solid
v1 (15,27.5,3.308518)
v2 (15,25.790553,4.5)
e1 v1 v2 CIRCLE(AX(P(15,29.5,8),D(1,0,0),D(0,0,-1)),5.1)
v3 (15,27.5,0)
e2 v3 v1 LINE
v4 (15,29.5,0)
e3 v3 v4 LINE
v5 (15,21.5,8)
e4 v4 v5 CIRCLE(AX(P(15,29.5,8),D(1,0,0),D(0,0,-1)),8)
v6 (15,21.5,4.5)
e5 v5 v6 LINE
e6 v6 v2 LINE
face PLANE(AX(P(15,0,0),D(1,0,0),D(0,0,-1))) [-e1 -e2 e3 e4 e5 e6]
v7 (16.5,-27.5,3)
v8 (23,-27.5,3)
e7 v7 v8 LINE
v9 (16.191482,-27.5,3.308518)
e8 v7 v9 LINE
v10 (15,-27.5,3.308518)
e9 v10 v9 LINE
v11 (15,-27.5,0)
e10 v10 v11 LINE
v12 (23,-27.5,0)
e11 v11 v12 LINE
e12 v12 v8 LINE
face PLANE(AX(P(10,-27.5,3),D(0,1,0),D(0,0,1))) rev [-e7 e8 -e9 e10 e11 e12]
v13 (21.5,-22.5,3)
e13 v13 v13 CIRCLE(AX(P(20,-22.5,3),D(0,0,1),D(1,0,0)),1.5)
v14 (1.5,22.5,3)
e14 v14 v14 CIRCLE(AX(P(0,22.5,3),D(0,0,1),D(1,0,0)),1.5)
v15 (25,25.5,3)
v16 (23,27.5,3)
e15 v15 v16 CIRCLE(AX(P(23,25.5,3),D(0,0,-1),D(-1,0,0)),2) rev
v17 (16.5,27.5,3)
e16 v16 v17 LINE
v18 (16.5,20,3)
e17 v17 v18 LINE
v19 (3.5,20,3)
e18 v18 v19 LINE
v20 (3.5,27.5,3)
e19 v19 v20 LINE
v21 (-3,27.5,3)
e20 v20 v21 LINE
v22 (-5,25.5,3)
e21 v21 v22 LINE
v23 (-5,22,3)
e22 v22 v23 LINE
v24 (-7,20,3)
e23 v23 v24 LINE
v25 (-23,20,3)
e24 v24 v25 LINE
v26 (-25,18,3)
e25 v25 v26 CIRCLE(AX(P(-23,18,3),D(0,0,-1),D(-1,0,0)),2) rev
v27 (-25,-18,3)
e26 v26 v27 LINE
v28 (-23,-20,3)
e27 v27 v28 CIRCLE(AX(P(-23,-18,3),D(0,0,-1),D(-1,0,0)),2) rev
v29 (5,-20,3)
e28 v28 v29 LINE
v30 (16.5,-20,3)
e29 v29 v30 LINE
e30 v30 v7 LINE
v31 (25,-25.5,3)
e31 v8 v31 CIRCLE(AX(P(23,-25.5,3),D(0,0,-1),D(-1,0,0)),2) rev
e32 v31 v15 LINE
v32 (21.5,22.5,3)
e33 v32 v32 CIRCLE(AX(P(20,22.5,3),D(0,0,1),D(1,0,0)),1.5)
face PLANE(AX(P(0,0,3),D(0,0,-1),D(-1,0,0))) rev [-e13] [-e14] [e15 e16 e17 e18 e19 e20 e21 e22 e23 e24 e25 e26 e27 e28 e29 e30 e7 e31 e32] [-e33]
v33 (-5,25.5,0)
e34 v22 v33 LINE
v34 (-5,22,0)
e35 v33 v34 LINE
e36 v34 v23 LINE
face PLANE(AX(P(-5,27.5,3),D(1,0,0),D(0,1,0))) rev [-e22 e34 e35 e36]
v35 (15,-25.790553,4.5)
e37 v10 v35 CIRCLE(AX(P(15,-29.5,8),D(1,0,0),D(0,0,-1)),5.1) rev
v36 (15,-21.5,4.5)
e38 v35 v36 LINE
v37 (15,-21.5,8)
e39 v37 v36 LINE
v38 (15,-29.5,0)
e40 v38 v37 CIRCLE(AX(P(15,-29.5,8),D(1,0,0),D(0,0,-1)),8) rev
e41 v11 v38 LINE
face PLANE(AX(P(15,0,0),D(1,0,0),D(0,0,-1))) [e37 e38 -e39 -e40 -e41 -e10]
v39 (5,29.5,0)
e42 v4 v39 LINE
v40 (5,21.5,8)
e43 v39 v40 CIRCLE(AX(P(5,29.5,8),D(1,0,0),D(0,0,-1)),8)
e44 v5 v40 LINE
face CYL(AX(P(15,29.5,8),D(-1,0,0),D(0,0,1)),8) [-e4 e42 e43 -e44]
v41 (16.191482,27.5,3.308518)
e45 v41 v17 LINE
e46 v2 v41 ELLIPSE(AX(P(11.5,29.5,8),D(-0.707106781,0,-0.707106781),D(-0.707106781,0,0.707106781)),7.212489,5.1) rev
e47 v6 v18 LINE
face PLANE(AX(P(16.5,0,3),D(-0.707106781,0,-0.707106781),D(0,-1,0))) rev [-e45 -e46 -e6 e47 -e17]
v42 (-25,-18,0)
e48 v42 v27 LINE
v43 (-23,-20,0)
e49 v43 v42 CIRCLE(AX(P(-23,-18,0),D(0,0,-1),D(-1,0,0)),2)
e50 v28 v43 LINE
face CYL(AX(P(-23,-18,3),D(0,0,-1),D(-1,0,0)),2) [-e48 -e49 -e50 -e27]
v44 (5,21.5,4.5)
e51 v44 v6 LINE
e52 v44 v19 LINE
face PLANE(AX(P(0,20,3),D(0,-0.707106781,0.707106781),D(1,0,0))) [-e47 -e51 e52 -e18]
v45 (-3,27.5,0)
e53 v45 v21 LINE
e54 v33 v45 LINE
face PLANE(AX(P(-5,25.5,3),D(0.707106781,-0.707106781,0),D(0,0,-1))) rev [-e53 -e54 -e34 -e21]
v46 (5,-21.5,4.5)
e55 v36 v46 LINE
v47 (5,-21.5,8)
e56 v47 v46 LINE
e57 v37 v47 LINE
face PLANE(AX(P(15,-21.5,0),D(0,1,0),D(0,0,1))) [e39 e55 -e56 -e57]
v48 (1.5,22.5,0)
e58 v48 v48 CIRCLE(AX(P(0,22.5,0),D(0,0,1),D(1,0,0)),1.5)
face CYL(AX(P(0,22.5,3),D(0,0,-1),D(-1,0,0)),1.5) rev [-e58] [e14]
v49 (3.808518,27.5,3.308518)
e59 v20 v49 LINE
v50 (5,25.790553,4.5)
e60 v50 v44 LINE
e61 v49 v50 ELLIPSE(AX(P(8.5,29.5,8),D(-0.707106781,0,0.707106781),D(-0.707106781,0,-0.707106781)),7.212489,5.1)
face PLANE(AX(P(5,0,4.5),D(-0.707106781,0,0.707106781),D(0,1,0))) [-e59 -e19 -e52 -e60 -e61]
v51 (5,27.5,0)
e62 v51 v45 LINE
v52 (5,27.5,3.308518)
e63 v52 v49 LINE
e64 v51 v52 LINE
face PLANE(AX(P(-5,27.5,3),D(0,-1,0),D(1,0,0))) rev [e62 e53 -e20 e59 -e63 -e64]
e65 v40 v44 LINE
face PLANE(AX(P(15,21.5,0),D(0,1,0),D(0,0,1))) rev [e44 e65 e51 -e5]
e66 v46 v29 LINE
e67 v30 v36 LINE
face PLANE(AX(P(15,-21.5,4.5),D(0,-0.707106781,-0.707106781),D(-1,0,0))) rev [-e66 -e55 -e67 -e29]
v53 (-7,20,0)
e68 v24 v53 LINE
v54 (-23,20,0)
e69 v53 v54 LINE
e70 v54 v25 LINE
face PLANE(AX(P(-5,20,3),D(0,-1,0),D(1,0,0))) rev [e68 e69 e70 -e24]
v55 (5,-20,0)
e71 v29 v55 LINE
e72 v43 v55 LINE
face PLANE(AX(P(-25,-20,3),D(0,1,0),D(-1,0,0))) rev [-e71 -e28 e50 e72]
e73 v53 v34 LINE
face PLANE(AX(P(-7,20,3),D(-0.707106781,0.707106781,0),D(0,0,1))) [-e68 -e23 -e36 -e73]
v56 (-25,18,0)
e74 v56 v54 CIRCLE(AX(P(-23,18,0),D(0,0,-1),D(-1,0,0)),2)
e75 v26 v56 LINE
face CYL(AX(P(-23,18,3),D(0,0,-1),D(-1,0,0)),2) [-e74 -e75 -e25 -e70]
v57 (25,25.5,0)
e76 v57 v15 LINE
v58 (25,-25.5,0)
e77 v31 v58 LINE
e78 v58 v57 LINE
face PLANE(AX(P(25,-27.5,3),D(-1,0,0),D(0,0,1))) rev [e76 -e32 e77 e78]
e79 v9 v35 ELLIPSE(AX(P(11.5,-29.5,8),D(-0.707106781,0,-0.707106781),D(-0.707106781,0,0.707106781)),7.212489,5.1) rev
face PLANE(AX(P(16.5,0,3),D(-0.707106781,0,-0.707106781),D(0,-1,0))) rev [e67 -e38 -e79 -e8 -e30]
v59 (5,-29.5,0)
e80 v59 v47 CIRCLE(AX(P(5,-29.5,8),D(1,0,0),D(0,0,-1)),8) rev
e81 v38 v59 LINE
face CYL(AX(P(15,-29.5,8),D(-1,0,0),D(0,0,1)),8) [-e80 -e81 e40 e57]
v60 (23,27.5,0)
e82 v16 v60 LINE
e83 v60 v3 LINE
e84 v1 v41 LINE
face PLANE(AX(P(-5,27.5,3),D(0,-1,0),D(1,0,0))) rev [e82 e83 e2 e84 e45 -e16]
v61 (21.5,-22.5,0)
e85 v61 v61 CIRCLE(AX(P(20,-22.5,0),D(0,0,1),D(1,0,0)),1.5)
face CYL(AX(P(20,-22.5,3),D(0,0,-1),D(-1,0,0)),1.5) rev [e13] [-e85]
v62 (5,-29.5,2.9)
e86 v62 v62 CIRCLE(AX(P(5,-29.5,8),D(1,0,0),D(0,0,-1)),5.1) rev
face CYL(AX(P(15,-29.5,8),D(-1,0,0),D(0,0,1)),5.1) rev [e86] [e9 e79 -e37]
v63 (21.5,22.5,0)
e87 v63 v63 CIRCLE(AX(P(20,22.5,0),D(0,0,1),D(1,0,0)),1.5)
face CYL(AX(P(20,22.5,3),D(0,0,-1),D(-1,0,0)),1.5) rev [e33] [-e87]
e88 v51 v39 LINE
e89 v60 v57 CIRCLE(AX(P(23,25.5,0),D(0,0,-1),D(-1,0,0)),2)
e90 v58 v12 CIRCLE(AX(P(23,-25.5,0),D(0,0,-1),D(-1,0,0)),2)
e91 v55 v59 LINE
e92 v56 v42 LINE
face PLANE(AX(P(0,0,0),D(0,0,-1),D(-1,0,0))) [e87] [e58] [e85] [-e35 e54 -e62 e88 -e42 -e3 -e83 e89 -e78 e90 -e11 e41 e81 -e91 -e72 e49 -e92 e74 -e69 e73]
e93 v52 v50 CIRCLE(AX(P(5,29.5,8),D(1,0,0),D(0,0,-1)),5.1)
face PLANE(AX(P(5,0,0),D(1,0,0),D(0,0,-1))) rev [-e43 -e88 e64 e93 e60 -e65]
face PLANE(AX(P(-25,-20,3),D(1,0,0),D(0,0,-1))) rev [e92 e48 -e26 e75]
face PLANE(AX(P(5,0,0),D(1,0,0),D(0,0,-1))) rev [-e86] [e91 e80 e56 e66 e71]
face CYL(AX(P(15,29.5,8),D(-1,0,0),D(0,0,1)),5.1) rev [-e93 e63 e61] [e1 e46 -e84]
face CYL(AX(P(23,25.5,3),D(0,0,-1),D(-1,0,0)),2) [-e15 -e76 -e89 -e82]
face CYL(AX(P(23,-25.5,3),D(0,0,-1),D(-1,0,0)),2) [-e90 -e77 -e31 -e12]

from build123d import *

# Parameters (mm, degrees)
SKETCH1_R           = 1.5
BOSS_EXTRUDE1_DEPTH = 3
FILLET1_R           = 2
BOSS_EXTRUDE2_START = 5
SKETCH2_R           = 5.1
BOSS_EXTRUDE2_DEPTH = 10
CHAMFER1_SIZE       = 2
CHAMFER2_SIZE       = 1.5


with BuildPart() as part:
    # Sketch1 → Boss-Extrude1 (new body)
    with BuildSketch(Plane.XY):
        Polygon((10, -27.5), (25, -27.5), (25, 27.5), (-5, 27.5), (-5, 20), (-25, 20), (-25, -20), (10, -20), align=None)
        with Locations((0, 22.5)):
            Circle(SKETCH1_R, mode=Mode.SUBTRACT)
        with Locations((20, 22.5)):
            Circle(SKETCH1_R, mode=Mode.SUBTRACT)
        with Locations((20, -22.5)):
            Circle(SKETCH1_R, mode=Mode.SUBTRACT)
    extrude(amount=BOSS_EXTRUDE1_DEPTH)

    # Fillet1
    fillet1_edges = [part.edges().sort_by_distance(p)[0] for p in [
        (25, -27.5, 1.5),
        (-25, -20, 1.5),
        (-25, 20, 1.5),
        (25, 27.5, 1.5),
    ]]
    fillet(fillet1_edges, radius=FILLET1_R)

    # Sketch2 → Boss-Extrude2 (add)
    # profile 1 of 2: a face of its own
    with BuildSketch(Plane(origin=(0, 0, 0), x_dir=(0, 0, -1), z_dir=(1, 0, 0)).offset(BOSS_EXTRUDE2_START)):
        with BuildLine():
            ThreePointArc((0, -29.5), (-13.656854249, -35.156854249), (-8, -21.5))
            Line((-8, -21.5), (-3, -21.5))
            Line((-3, -21.5), (-3, -11.5))
            Line((-3, -11.5), (0, -11.5))
            Line((0, -11.5), (0, -29.5))
        make_face()
        with Locations((-8, -29.5)):
            Circle(SKETCH2_R, mode=Mode.SUBTRACT)
    # profile 2 of 2: a face of its own
    with BuildSketch(Plane(origin=(0, 0, 0), x_dir=(0, 0, -1), z_dir=(1, 0, 0)).offset(BOSS_EXTRUDE2_START)):
        with BuildLine():
            Line((0, 11.5), (0, 29.5))
            ThreePointArc((0, 29.5), (-13.656854249, 35.156854249), (-8, 21.5))
            Line((-8, 21.5), (-3, 21.5))
            Line((-3, 21.5), (-3, 11.5))
            Line((-3, 11.5), (0, 11.5))
        make_face()
        with Locations((-8, 29.5)):
            Circle(SKETCH2_R, mode=Mode.SUBTRACT)
    extrude(amount=BOSS_EXTRUDE2_DEPTH)

    # Chamfer1
    chamfer1_edges = [part.edges().sort_by_distance(p)[0] for p in [
        (-5, 20, 1.5),
        (-5, 27.5, 1.5),
    ]]
    chamfer(chamfer1_edges, length=CHAMFER1_SIZE)

    # Chamfer2
    # the kernel refuses this chamfer: 1.5 mm, written as the material it adds along each edge
    with BuildSketch(Plane(origin=(15, -21.5, 3), x_dir=(-0.02749587661058678, 0, 0.9996219169112968), z_dir=(0, -1, 0))) as chamfer2_piece_1_section:
        Polygon((CHAMFER2_SIZE * 0.999621916911, -CHAMFER2_SIZE * 0.0274958766106), (-CHAMFER2_SIZE * 0.0274958766106, -CHAMFER2_SIZE * 0.999621916911), (0, 0), align=None)
    chamfer2_piece_1 = extrude(amount=6, mode=Mode.PRIVATE)
    chamfer2_piece_1 = chamfer2_piece_1 - Plane(origin=(15.512165711, -29.5, 8), x_dir=(0, 0, -1), z_dir=(-1, 0, 0)) * Cylinder(5.1, 18, mode=Mode.PRIVATE)
    add(chamfer2_piece_1)
    with BuildSketch(Plane(origin=(5, -21.5, 3), x_dir=(0, 0.9996219169112968, -0.02749587661058648), z_dir=(1, 0, 0))) as chamfer2_piece_2_section:
        Polygon((CHAMFER2_SIZE * 0.999621916911, CHAMFER2_SIZE * 0.0274958766106), (-CHAMFER2_SIZE * 0.0274958766106, CHAMFER2_SIZE * 0.999621916911), (0, 0), align=None)
    chamfer2_piece_2 = extrude(amount=10, mode=Mode.PRIVATE)
    chamfer2_piece_2 = split(chamfer2_piece_2, bisect_by=Plane(origin=(10, -20, 3.495606231), z_dir=(0, -1, 0)), keep=Keep.TOP, mode=Mode.PRIVATE)
    add(chamfer2_piece_2)
    with BuildSketch(Plane(origin=(15, 21.5, 3), x_dir=(-0.02749587661058678, 0, 0.9996219169112968), z_dir=(0, 1, 0))) as chamfer2_piece_3_section:
        Polygon((CHAMFER2_SIZE * 0.999621916911, CHAMFER2_SIZE * 0.0274958766106), (-CHAMFER2_SIZE * 0.0274958766106, CHAMFER2_SIZE * 0.999621916911), (0, 0), align=None)
    chamfer2_piece_3 = extrude(amount=6, mode=Mode.PRIVATE)
    chamfer2_piece_3 = chamfer2_piece_3 - Plane(origin=(15.512165714, 29.5, 8), x_dir=(0, 0, -1), z_dir=(-1, 0, 0)) * Cylinder(5.1, 18, mode=Mode.PRIVATE)
    add(chamfer2_piece_3)
    with BuildSketch(Plane(origin=(5, 21.5, 3), x_dir=(0.027495876610586206, 0, 0.9996219169112968), z_dir=(0, 1, 0))) as chamfer2_piece_4_section:
        Polygon((CHAMFER2_SIZE * 0.999621916911, -CHAMFER2_SIZE * 0.0274958766106), (-CHAMFER2_SIZE * 0.0274958766106, -CHAMFER2_SIZE * 0.999621916911), (0, 0), align=None)
    chamfer2_piece_4 = extrude(amount=6, mode=Mode.PRIVATE)
    chamfer2_piece_4 = chamfer2_piece_4 - Plane(origin=(4.487834286, 29.5, 8), x_dir=(0, 0, -1), z_dir=(-1, 0, 0)) * Cylinder(5.1, 18, mode=Mode.PRIVATE)
    add(chamfer2_piece_4)
    with BuildSketch(Plane(origin=(5, 21.5, 3), x_dir=(0, -0.9996219169112968, -0.02749587661058648), z_dir=(1, 0, 0))) as chamfer2_piece_5:
        Polygon((CHAMFER2_SIZE * 0.999621916911, -CHAMFER2_SIZE * 0.0274958766106), (-CHAMFER2_SIZE * 0.0274958766106, -CHAMFER2_SIZE * 0.999621916911), (0, 0), align=None)
    extrude(amount=10)
    with BuildSketch(Plane(origin=(15, -17.642475518, 3), x_dir=(-0.02749587661058678, 0, 0.9996219169112968), z_dir=(0, -1, 0))) as chamfer2_piece_6a_section:
        Polygon((CHAMFER2_SIZE * 0.999621916911, -CHAMFER2_SIZE * 0.0274958766106), (-CHAMFER2_SIZE * 0.0274958766106, -CHAMFER2_SIZE * 0.999621916911), (0, 0), align=None)
    chamfer2_piece_6a = extrude(amount=9.857524482, mode=Mode.PRIVATE)
    chamfer2_piece_6a = split(chamfer2_piece_6a, bisect_by=Plane(origin=(15.49469044, -21.5, 3.49469044), z_dir=(0, 1, 0)), keep=Keep.TOP, mode=Mode.PRIVATE)
    with BuildSketch(Plane(origin=(5, -21.5, 3), x_dir=(0, 0.9996219169112968, -0.02749587661058648), z_dir=(1, 0, 0))) as chamfer2_piece_6b_section:
        Polygon((CHAMFER2_SIZE * 0.999621916911, CHAMFER2_SIZE * 0.0274958766106), (-CHAMFER2_SIZE * 0.0274958766106, CHAMFER2_SIZE * 0.999621916911), (0, 0), align=None)
    chamfer2_piece_6b = extrude(amount=13.857524482, mode=Mode.PRIVATE)
    chamfer2_piece_6b = split(chamfer2_piece_6b, bisect_by=Plane(origin=(16.928692538, -20, 3.495574544), z_dir=(0, -1, 0)), keep=Keep.TOP, mode=Mode.PRIVATE)
    chamfer2_piece_6b = split(chamfer2_piece_6b, bisect_by=Plane(origin=(15, -21.007028814, 3.495574544), z_dir=(1, 0, 0)), keep=Keep.TOP, mode=Mode.PRIVATE)
    chamfer2_piece_6b = chamfer2_piece_6b - Plane(origin=(20, -22.5, 3.495574544), x_dir=(1, 0, 0), z_dir=(0, 0, -1)) * Cylinder(1.5, 34, mode=Mode.PRIVATE)
    chamfer2_piece_6 = chamfer2_piece_6a & chamfer2_piece_6b
    add(chamfer2_piece_6)
    with BuildSketch(Plane(origin=(15, 17.642475518, 3), x_dir=(-0.02749587661058678, 0, 0.9996219169112968), z_dir=(0, 1, 0))) as chamfer2_piece_7a_section:
        Polygon((CHAMFER2_SIZE * 0.999621916911, CHAMFER2_SIZE * 0.0274958766106), (-CHAMFER2_SIZE * 0.0274958766106, CHAMFER2_SIZE * 0.999621916911), (0, 0), align=None)
    chamfer2_piece_7a = extrude(amount=9.857524482, mode=Mode.PRIVATE)
    chamfer2_piece_7a = split(chamfer2_piece_7a, bisect_by=Plane(origin=(15.49469044, 21.5, 3.49469044), z_dir=(0, -1, 0)), keep=Keep.TOP, mode=Mode.PRIVATE)
    with BuildSketch(Plane(origin=(5, 21.5, 3), x_dir=(0, -0.9996219169112968, -0.02749587661058648), z_dir=(1, 0, 0))) as chamfer2_piece_7b_section:
        Polygon((CHAMFER2_SIZE * 0.999621916911, -CHAMFER2_SIZE * 0.0274958766106), (-CHAMFER2_SIZE * 0.0274958766106, -CHAMFER2_SIZE * 0.999621916911), (0, 0), align=None)
    chamfer2_piece_7b = extrude(amount=13.857524482, mode=Mode.PRIVATE)
    chamfer2_piece_7b = split(chamfer2_piece_7b, bisect_by=Plane(origin=(15, 21.005289845, 3.494658773), z_dir=(1, 0, 0)), keep=Keep.TOP, mode=Mode.PRIVATE)
    chamfer2_piece_7b = chamfer2_piece_7b - Plane(origin=(20, 22.5, 3.494658773), x_dir=(1, 0, 0), z_dir=(0, 0, -1)) * Cylinder(1.5, 34, mode=Mode.PRIVATE)
    chamfer2_piece_7 = chamfer2_piece_7a & chamfer2_piece_7b
    add(chamfer2_piece_7)
    with BuildSketch(Plane(origin=(5, 17.642475518, 3), x_dir=(0.027495876610586206, 0, 0.9996219169112968), z_dir=(0, 1, 0))) as chamfer2_piece_8a_section:
        Polygon((CHAMFER2_SIZE * 0.999621916911, -CHAMFER2_SIZE * 0.0274958766106), (-CHAMFER2_SIZE * 0.0274958766106, -CHAMFER2_SIZE * 0.999621916911), (0, 0), align=None)
    chamfer2_piece_8a = extrude(amount=9.857524482, mode=Mode.PRIVATE)
    chamfer2_piece_8a = split(chamfer2_piece_8a, bisect_by=Plane(origin=(4.50530956, 21.5, 3.49469044), z_dir=(0, -1, 0)), keep=Keep.TOP, mode=Mode.PRIVATE)
    with BuildSketch(Plane(origin=(1.142475518, 21.5, 3), x_dir=(0, -0.9996219169112968, -0.02749587661058648), z_dir=(1, 0, 0))) as chamfer2_piece_8b_section:
        Polygon((CHAMFER2_SIZE * 0.999621916911, -CHAMFER2_SIZE * 0.0274958766106), (-CHAMFER2_SIZE * 0.0274958766106, -CHAMFER2_SIZE * 0.999621916911), (0, 0), align=None)
    chamfer2_piece_8b = extrude(amount=13.857524482, mode=Mode.PRIVATE)
    chamfer2_piece_8b = split(chamfer2_piece_8b, bisect_by=Plane(origin=(5, 21.005289845, 3.494658773), z_dir=(-1, 0, 0)), keep=Keep.TOP, mode=Mode.PRIVATE)
    chamfer2_piece_8b = chamfer2_piece_8b - Plane(origin=(0, 22.5, 3.494658773), x_dir=(1, 0, 0), z_dir=(0, 0, -1)) * Cylinder(1.5, 34, mode=Mode.PRIVATE)
    chamfer2_piece_8 = chamfer2_piece_8a & chamfer2_piece_8b
    add(chamfer2_piece_8)


solid = part.part
